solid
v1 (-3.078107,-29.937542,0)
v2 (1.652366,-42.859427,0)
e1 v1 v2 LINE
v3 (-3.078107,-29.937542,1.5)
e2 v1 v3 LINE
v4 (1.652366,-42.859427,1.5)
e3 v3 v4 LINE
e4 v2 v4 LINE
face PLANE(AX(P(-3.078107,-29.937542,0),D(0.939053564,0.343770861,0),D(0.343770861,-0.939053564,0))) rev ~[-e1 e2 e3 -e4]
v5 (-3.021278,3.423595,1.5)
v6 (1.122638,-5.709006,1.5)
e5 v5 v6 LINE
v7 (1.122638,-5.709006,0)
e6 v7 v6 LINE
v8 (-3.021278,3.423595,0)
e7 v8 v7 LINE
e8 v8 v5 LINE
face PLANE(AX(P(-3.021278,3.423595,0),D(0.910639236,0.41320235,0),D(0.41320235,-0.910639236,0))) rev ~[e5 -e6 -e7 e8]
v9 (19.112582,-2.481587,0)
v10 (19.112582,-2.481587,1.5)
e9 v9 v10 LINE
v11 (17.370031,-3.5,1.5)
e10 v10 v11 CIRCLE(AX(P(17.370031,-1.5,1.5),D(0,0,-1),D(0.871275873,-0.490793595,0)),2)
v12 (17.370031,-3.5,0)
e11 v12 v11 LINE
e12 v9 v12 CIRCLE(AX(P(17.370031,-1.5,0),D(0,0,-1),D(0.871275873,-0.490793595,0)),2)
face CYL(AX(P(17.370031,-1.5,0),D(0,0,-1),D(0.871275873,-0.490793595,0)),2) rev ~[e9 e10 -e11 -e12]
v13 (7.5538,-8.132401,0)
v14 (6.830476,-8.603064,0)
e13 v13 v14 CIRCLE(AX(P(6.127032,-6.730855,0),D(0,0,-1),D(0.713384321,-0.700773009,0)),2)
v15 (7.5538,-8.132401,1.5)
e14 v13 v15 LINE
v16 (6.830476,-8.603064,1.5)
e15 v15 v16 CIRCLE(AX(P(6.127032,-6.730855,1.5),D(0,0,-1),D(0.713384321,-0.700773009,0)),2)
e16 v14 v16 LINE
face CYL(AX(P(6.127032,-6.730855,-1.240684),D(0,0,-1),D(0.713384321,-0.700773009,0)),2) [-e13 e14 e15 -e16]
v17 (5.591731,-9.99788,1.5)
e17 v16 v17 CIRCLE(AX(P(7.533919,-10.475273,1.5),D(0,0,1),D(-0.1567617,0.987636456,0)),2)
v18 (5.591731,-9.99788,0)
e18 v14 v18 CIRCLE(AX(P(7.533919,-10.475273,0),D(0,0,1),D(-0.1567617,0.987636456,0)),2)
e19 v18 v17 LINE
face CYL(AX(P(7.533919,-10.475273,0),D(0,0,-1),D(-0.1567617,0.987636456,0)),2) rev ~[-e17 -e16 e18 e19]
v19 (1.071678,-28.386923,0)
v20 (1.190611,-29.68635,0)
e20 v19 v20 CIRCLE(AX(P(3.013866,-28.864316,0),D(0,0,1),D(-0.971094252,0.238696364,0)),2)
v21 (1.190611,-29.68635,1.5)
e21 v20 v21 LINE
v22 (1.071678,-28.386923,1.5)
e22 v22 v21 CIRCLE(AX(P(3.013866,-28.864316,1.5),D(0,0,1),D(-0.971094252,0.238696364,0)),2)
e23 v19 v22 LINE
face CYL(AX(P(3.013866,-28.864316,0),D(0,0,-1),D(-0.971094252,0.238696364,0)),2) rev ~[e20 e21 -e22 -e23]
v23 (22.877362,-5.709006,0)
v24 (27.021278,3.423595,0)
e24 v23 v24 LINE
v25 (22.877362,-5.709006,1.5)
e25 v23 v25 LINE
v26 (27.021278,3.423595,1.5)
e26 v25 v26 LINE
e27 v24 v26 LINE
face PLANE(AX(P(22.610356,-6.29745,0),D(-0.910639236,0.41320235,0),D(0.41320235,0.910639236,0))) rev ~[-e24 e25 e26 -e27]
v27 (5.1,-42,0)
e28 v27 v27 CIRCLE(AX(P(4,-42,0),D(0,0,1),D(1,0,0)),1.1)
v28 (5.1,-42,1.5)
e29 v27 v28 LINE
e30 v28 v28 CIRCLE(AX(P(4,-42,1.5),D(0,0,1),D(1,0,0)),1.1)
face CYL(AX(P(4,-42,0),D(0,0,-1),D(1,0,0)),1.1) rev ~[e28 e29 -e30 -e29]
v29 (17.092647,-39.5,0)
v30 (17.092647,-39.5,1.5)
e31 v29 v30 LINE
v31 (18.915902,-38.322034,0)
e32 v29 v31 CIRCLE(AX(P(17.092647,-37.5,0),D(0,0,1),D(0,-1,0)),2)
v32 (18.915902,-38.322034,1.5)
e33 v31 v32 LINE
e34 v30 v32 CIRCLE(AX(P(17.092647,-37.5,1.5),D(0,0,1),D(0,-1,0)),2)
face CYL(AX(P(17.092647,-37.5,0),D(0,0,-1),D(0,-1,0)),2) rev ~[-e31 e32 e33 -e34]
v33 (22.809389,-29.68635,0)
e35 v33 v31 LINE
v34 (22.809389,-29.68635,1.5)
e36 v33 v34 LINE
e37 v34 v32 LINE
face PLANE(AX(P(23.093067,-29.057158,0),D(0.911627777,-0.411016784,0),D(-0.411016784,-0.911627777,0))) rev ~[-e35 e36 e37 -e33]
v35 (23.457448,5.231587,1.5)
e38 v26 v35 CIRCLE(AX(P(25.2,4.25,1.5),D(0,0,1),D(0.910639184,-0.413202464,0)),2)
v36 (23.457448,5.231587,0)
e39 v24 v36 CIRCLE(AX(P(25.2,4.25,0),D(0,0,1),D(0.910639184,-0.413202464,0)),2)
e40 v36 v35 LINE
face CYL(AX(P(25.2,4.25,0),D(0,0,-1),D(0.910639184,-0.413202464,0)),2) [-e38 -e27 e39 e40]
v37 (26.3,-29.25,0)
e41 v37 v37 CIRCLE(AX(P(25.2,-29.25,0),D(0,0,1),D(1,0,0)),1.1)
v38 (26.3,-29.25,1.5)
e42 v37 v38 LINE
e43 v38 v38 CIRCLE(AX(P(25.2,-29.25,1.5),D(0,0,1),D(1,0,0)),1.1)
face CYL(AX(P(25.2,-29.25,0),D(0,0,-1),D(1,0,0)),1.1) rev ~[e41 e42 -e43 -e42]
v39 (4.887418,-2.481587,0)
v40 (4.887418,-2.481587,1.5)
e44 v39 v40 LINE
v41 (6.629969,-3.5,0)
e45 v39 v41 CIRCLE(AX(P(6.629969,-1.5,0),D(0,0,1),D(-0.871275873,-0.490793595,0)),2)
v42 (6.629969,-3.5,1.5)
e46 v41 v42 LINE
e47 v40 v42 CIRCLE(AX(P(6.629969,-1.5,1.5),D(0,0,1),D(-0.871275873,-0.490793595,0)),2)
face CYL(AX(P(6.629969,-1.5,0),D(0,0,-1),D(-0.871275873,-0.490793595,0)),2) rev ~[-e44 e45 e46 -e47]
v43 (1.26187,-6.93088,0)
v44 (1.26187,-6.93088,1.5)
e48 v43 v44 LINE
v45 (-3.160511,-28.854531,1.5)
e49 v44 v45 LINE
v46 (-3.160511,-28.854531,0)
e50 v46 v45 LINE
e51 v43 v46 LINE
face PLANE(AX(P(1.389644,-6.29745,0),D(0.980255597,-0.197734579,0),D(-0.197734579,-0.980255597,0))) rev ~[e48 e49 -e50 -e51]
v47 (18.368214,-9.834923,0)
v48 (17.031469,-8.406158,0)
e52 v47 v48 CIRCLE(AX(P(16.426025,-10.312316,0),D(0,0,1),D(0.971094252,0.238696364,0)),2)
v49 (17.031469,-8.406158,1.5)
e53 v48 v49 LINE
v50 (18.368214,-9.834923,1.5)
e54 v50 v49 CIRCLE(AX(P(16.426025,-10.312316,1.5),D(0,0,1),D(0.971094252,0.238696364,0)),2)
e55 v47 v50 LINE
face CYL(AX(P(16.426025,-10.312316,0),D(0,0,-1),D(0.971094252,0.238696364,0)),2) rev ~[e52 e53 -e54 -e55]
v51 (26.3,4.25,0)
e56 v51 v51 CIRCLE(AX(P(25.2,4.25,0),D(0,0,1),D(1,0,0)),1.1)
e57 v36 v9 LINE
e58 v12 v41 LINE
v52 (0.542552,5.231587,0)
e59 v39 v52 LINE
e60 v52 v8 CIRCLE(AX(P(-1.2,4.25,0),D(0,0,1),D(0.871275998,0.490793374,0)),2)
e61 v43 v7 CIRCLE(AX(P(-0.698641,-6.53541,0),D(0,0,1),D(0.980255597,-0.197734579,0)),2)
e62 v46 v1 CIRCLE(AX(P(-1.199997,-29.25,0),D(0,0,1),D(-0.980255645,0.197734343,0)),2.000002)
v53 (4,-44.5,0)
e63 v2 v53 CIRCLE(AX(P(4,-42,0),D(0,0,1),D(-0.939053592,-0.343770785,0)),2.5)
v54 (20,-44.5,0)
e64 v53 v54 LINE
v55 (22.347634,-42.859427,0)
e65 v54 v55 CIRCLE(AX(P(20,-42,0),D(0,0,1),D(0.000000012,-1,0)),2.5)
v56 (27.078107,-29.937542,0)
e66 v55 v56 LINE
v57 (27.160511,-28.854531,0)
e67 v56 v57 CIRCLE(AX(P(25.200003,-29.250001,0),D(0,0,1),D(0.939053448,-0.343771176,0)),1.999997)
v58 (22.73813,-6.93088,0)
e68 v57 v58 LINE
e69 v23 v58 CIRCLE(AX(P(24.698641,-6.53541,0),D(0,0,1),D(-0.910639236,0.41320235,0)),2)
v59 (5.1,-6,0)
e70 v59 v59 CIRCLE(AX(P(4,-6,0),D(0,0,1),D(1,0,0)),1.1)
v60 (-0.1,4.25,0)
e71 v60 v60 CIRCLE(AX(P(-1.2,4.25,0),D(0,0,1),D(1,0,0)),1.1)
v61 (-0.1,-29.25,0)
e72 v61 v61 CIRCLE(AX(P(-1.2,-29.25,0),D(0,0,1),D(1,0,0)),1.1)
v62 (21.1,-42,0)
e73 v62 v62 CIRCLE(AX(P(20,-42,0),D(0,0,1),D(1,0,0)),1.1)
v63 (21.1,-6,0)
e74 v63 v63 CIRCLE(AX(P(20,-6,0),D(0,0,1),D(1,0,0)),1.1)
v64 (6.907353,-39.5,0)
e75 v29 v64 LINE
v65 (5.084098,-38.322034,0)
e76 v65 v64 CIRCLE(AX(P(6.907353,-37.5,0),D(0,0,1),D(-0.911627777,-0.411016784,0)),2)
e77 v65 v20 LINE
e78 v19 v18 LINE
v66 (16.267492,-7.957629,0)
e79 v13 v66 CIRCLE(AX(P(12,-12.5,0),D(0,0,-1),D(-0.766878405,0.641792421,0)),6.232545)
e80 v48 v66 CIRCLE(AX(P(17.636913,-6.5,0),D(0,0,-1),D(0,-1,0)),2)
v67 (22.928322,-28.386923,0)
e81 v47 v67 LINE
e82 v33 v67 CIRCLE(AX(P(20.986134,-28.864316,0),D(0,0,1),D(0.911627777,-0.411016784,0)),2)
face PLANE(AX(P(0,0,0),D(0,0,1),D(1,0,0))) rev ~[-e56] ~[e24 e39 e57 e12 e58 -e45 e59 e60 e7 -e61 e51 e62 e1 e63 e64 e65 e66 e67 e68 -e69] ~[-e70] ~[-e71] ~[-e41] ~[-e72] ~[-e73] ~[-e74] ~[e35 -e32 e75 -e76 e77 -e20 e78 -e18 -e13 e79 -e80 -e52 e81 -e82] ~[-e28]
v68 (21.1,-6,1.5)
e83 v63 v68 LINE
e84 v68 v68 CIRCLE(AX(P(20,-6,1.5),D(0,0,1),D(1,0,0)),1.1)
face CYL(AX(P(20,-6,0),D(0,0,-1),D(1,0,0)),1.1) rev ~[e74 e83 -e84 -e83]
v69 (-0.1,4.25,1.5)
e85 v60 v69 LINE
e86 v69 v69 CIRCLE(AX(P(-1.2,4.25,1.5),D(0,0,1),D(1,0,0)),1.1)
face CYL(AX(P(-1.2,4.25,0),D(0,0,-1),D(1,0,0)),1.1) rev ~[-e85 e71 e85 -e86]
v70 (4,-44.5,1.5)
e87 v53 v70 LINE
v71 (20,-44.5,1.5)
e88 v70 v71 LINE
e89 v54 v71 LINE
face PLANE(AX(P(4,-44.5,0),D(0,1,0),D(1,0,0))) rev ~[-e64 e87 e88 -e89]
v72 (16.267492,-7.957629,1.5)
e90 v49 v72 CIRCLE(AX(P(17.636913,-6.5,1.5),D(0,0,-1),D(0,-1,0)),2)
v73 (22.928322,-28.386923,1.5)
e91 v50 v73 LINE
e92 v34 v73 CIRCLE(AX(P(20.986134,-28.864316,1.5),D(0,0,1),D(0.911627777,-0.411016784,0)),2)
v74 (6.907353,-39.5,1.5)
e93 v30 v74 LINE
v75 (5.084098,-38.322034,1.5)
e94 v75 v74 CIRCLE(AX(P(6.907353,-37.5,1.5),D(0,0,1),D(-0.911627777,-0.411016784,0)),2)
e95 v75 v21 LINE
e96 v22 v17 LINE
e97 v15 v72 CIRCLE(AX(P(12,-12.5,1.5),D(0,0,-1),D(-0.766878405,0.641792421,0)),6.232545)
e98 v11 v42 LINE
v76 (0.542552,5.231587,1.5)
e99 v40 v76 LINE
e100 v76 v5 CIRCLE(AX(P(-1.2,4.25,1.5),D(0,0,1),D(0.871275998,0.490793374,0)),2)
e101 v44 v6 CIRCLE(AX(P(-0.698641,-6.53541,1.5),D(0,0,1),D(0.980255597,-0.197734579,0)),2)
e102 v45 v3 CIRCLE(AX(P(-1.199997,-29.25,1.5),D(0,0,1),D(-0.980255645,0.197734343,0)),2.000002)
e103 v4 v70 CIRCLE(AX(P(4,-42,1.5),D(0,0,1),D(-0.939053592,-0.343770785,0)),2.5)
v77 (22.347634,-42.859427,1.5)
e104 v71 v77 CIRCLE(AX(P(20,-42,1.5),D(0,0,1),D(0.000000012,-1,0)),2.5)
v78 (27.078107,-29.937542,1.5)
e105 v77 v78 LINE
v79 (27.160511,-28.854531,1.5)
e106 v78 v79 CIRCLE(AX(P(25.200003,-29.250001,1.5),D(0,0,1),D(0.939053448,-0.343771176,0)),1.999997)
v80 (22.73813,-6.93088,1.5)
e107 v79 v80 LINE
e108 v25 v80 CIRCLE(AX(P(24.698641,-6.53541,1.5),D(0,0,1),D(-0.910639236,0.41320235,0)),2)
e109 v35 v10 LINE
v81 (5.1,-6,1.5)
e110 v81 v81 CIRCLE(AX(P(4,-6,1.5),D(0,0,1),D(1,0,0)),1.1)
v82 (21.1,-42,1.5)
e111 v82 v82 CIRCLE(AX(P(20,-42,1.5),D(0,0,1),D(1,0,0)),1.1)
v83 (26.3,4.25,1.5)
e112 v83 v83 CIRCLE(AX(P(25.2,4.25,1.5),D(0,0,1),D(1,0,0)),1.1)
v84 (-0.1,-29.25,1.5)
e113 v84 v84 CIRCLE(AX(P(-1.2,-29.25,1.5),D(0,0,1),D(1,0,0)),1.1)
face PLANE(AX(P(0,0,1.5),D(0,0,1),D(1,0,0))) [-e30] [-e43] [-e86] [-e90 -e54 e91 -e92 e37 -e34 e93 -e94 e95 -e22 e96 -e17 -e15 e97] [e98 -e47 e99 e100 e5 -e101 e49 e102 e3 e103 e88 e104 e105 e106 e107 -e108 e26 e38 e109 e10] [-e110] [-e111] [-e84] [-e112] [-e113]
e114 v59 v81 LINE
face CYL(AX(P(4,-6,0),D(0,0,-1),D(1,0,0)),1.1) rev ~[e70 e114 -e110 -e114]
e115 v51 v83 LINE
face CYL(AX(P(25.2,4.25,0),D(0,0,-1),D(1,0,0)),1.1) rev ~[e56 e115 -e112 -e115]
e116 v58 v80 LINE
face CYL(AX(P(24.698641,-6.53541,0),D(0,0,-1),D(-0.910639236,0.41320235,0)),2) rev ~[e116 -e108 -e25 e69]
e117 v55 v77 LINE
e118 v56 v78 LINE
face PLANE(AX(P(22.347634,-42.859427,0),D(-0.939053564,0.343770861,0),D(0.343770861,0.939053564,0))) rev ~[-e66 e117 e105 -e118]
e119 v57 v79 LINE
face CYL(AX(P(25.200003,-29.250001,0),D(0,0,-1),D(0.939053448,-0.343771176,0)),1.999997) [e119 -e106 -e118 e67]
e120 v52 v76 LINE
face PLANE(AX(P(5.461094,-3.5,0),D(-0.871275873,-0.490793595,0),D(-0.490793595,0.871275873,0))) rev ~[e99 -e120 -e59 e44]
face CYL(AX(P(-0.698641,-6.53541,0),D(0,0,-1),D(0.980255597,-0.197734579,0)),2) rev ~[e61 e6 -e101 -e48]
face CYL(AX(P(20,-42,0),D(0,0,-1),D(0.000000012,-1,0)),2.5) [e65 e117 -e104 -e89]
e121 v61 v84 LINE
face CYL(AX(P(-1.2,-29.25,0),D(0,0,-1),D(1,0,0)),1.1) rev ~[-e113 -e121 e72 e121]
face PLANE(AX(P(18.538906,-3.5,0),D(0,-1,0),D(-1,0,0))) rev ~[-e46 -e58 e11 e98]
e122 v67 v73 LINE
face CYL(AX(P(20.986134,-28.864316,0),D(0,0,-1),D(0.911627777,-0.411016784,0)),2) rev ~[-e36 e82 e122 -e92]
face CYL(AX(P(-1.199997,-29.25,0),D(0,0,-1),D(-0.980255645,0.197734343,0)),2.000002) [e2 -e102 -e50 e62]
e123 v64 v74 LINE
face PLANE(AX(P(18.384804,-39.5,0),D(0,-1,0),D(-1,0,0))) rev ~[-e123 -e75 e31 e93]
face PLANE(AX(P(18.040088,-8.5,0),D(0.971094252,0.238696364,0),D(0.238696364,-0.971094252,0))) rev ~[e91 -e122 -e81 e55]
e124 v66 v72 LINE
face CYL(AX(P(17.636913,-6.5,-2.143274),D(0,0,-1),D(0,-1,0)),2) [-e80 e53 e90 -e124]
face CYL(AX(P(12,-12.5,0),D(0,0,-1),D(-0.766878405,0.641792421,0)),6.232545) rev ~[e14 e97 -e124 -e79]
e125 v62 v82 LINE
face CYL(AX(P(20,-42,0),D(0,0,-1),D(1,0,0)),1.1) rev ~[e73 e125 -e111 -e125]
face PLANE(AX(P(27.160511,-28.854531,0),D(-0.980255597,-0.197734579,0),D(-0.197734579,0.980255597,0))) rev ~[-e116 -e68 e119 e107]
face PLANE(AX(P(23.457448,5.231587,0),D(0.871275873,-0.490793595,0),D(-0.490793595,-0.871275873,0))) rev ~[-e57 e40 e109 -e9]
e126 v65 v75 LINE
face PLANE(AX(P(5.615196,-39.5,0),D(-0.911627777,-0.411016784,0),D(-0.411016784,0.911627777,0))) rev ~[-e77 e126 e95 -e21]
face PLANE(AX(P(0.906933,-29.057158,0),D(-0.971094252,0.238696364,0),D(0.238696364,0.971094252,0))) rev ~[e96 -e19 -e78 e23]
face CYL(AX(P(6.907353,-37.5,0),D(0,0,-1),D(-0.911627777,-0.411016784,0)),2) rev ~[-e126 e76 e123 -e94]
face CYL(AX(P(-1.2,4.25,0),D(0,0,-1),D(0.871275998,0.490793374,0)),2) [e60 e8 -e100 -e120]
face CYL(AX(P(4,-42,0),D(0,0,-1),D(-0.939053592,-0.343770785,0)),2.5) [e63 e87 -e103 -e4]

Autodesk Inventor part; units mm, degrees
ref_plane "YZ Plane" through (0, 0, 0) normal (1, 0, 0) x (0, 1, 0)
ref_plane "XZ Plane" through (0, 0, 0) normal (0, 1, 0) x (-1, 0, 0)
ref_plane "XY Plane" through (0, 0, 0) normal (0, 0, 1) x (1, 0, 0)
sketch "スケッチ1" plane through (0, 0, 0) normal (0, 0, 1) x (1, 0, 0)
  circle A0 centre (4, -6) radius 1.05
  circle A1 centre (4, -6) radius 1.1
  circle A2 centre (20, -6) radius 1.05
  circle A3 centre (20, -42) radius 1.1
  circle A4 centre (4, -42) radius 1.05
  circle A5 centre (20, -6) radius 1.1
  circle A6 centre (20, -42) radius 1.1
  circle A7 centre (4, -42) radius 1.1
  circle A8 centre (4, -42) radius 2.5
  circle A9 centre (20, -42) radius 2.5
  circle A10 centre (20, -6) radius 2.5
  circle A11 centre (4, -6) radius 2.5
  arc A12 (-0.741742, -29.885509) -> (-0.741742, -28.614491) centre (-1.2, -29.25) ccw
  arc A13 (24.741742, -28.614491) -> (24.741742, -29.885509) centre (25.2, -29.25) ccw
  arc A14 (-0.741742, 3.614491) -> (-0.741742, 4.885509) centre (-1.2, 4.25) ccw
  arc A15 (24.741742, 4.885509) -> (24.741742, 3.614491) centre (25.2, 4.25) ccw
  line L0 (24.741742, 5.75) -> (24.741742, 4.885509)
  line L1 (24.741742, 5.75) -> (22.7, 5.75)
  line L2 (22.7, 5.75) -> (22.7, 2.75)
  line L3 (24.741742, 2.75) -> (22.7, 2.75)
  line L4 (24.741742, 3.614491) -> (24.741742, 2.75)
  circle A16 centre (-1.2, 4.25) radius 1.1
  circle A17 centre (25.2, 4.25) radius 1.1
  circle A18 centre (25.2, -29.25) radius 1.1
  circle A19 centre (-1.2, -29.25) radius 1.1
  circle A20 centre (-1.2, -29.25) radius 2
  circle A21 centre (25.2, -29.25) radius 2
  circle A22 centre (25.2, 4.25) radius 2
  circle A23 centre (-1.2, 4.25) radius 2
  line L5 (-3.078107, -29.937542) -> (1.652366, -42.859427)
  line L6 (0.623256, -28.427966) -> (6.279069, -40.972458)
  line L7 (4, -39.5) -> (20, -39.5)
  line L8 (20, -44.5) -> (4, -44.5)
  line L9 (0.742189, -29.727393) -> (6.427736, -6.596741)
  line L10 (-3.160511, -28.854531) -> (1.549361, -5.505664)
  line L11 (-3.021278, 3.423595) -> (1.723402, -7.033006)
  line L12 (6.17819, -4.773016) -> (0.542552, 5.231587)
  line L13 (4, -3.5) -> (20, -3.5)
  line L14 (20, -8.5) -> (4, -8.5)
  line L15 (17.82181, -4.773016) -> (23.457448, 5.231587)
  line L16 (27.021278, 3.423595) -> (22.276598, -7.033006)
  line L17 (17.572264, -6.596741) -> (23.257811, -29.727393)
  line L18 (27.160511, -28.854531) -> (22.450639, -5.505664)
  line L19 (23.376744, -28.427966) -> (17.720931, -40.972458)
  line L20 (27.078107, -29.937542) -> (22.347634, -42.859427)
  circle A24 centre (12, -12.5) radius 6.232545
  point P0 (0, 0)
  point P1 (5.615196, -39.5)
  point P2 (0.906933, -29.057158)
  point P3 (5.959912, -8.5)
  point P4 (18.040088, -8.5)
  point P5 (23.093067, -29.057158)
  point P6 (18.384804, -39.5)
  point P7 (18.538906, -3.5)
  point P8 (5.461094, -3.5)
  point P9 (1.389644, -6.29745)
  point P10 (22.610356, -6.29745)
  point P11 (7.220396, -8.5)
  point P12 (16.779604, -8.5)
  dimension "d0" = 2.2
  dimension "d1" = 2.2
  dimension "d2" = 2.2
  dimension "d3" = 2.2
  dimension "d4" = 5
  dimension "d5" = 5
  dimension "d6" = 5
  dimension "d7" = 5
  dimension "d8" = 2.2
  dimension "d9" = 2.2
  dimension "d10" = 2.2
  dimension "d11" = 2.2
  dimension "d12" = 4
  dimension "d13" = 4
  dimension "d14" = 4
  dimension "d15" = 4
sketch "スケッチ1 outline for 押し出し1" plane through (0, 0, 0) normal (0, 0, 1) x (1, 0, 0)
  arc A0 (27.021278, 3.423595) -> (23.457448, 5.231587) centre (25.2, 4.25) ccw
  line L0 (22.610356, -6.29745) -> (27.021278, 3.423595)
  line L1 (23.457448, 5.231587) -> (18.538906, -3.5)
  line L2 (27.160511, -28.854531) -> (22.610356, -6.29745)
  line L3 (18.538906, -3.5) -> (5.461094, -3.5)
  arc A1 (27.078107, -29.937542) -> (27.160511, -28.854531) centre (25.2, -29.25) ccw
  line L4 (5.461094, -3.5) -> (0.542552, 5.231587)
  line L5 (22.347634, -42.859427) -> (27.078107, -29.937542)
  arc A2 (0.542552, 5.231587) -> (-3.021278, 3.423595) centre (-1.2, 4.25) ccw
  arc A3 (20, -44.5) -> (22.347634, -42.859427) centre (20, -42) ccw
  line L6 (-3.021278, 3.423595) -> (1.389644, -6.29745)
  line L7 (4, -44.5) -> (20, -44.5)
  line L8 (1.389644, -6.29745) -> (-3.160511, -28.854531)
  arc A4 (1.652366, -42.859427) -> (4, -44.5) centre (4, -42) ccw
  arc A5 (-3.160511, -28.854531) -> (-3.078107, -29.937542) centre (-1.2, -29.25) ccw
  line L9 (-3.078107, -29.937542) -> (1.652366, -42.859427)
  circle A6 centre (4, -42) radius 1.1
  circle A7 centre (-1.2, -29.25) radius 1.1
  circle A8 centre (20, -42) radius 1.1
  line L10 (5.615196, -39.5) -> (0.906933, -29.057158)
  line L11 (18.384804, -39.5) -> (5.615196, -39.5)
  line L12 (23.093067, -29.057158) -> (18.384804, -39.5)
  line L13 (18.040088, -8.5) -> (23.093067, -29.057158)
  line L14 (16.779604, -8.5) -> (18.040088, -8.5)
  arc A9 (7.220396, -8.5) -> (16.779604, -8.5) centre (12, -12.5) cw
  line L15 (5.959912, -8.5) -> (7.220396, -8.5)
  line L16 (0.906933, -29.057158) -> (5.959912, -8.5)
  circle A10 centre (25.2, -29.25) radius 1.1
  circle A11 centre (4, -6) radius 1.1
  circle A12 centre (-1.2, 4.25) radius 1.1
  circle A13 centre (20, -6) radius 1.1
  circle A14 centre (25.2, 4.25) radius 1.1
extrude "押し出し1" add sketch "スケッチ1 outline for 押し出し1" along normal blind 1.5
fillet "フィレット1" radius 2 12 edges at (0.9069, -29.0572, 0.75) (5.6152, -39.5, 0.75) (18.3848, -39.5, 0.75) (23.0931, -29.0572, 0.75) (18.0401, -8.5, 0.75) (5.9599, -8.5, 0.75) (7.2204, -8.5, 0.75) (16.7796, -8.5, 0.75) (5.4611, -3.5, 0.75) (18.5389, -3.5, 0.75) (1.3896, -6.2975, 0.75) (22.6104, -6.2975, 0.75)
properties part number "matasita" material "アルミニウム 2014-T4"
